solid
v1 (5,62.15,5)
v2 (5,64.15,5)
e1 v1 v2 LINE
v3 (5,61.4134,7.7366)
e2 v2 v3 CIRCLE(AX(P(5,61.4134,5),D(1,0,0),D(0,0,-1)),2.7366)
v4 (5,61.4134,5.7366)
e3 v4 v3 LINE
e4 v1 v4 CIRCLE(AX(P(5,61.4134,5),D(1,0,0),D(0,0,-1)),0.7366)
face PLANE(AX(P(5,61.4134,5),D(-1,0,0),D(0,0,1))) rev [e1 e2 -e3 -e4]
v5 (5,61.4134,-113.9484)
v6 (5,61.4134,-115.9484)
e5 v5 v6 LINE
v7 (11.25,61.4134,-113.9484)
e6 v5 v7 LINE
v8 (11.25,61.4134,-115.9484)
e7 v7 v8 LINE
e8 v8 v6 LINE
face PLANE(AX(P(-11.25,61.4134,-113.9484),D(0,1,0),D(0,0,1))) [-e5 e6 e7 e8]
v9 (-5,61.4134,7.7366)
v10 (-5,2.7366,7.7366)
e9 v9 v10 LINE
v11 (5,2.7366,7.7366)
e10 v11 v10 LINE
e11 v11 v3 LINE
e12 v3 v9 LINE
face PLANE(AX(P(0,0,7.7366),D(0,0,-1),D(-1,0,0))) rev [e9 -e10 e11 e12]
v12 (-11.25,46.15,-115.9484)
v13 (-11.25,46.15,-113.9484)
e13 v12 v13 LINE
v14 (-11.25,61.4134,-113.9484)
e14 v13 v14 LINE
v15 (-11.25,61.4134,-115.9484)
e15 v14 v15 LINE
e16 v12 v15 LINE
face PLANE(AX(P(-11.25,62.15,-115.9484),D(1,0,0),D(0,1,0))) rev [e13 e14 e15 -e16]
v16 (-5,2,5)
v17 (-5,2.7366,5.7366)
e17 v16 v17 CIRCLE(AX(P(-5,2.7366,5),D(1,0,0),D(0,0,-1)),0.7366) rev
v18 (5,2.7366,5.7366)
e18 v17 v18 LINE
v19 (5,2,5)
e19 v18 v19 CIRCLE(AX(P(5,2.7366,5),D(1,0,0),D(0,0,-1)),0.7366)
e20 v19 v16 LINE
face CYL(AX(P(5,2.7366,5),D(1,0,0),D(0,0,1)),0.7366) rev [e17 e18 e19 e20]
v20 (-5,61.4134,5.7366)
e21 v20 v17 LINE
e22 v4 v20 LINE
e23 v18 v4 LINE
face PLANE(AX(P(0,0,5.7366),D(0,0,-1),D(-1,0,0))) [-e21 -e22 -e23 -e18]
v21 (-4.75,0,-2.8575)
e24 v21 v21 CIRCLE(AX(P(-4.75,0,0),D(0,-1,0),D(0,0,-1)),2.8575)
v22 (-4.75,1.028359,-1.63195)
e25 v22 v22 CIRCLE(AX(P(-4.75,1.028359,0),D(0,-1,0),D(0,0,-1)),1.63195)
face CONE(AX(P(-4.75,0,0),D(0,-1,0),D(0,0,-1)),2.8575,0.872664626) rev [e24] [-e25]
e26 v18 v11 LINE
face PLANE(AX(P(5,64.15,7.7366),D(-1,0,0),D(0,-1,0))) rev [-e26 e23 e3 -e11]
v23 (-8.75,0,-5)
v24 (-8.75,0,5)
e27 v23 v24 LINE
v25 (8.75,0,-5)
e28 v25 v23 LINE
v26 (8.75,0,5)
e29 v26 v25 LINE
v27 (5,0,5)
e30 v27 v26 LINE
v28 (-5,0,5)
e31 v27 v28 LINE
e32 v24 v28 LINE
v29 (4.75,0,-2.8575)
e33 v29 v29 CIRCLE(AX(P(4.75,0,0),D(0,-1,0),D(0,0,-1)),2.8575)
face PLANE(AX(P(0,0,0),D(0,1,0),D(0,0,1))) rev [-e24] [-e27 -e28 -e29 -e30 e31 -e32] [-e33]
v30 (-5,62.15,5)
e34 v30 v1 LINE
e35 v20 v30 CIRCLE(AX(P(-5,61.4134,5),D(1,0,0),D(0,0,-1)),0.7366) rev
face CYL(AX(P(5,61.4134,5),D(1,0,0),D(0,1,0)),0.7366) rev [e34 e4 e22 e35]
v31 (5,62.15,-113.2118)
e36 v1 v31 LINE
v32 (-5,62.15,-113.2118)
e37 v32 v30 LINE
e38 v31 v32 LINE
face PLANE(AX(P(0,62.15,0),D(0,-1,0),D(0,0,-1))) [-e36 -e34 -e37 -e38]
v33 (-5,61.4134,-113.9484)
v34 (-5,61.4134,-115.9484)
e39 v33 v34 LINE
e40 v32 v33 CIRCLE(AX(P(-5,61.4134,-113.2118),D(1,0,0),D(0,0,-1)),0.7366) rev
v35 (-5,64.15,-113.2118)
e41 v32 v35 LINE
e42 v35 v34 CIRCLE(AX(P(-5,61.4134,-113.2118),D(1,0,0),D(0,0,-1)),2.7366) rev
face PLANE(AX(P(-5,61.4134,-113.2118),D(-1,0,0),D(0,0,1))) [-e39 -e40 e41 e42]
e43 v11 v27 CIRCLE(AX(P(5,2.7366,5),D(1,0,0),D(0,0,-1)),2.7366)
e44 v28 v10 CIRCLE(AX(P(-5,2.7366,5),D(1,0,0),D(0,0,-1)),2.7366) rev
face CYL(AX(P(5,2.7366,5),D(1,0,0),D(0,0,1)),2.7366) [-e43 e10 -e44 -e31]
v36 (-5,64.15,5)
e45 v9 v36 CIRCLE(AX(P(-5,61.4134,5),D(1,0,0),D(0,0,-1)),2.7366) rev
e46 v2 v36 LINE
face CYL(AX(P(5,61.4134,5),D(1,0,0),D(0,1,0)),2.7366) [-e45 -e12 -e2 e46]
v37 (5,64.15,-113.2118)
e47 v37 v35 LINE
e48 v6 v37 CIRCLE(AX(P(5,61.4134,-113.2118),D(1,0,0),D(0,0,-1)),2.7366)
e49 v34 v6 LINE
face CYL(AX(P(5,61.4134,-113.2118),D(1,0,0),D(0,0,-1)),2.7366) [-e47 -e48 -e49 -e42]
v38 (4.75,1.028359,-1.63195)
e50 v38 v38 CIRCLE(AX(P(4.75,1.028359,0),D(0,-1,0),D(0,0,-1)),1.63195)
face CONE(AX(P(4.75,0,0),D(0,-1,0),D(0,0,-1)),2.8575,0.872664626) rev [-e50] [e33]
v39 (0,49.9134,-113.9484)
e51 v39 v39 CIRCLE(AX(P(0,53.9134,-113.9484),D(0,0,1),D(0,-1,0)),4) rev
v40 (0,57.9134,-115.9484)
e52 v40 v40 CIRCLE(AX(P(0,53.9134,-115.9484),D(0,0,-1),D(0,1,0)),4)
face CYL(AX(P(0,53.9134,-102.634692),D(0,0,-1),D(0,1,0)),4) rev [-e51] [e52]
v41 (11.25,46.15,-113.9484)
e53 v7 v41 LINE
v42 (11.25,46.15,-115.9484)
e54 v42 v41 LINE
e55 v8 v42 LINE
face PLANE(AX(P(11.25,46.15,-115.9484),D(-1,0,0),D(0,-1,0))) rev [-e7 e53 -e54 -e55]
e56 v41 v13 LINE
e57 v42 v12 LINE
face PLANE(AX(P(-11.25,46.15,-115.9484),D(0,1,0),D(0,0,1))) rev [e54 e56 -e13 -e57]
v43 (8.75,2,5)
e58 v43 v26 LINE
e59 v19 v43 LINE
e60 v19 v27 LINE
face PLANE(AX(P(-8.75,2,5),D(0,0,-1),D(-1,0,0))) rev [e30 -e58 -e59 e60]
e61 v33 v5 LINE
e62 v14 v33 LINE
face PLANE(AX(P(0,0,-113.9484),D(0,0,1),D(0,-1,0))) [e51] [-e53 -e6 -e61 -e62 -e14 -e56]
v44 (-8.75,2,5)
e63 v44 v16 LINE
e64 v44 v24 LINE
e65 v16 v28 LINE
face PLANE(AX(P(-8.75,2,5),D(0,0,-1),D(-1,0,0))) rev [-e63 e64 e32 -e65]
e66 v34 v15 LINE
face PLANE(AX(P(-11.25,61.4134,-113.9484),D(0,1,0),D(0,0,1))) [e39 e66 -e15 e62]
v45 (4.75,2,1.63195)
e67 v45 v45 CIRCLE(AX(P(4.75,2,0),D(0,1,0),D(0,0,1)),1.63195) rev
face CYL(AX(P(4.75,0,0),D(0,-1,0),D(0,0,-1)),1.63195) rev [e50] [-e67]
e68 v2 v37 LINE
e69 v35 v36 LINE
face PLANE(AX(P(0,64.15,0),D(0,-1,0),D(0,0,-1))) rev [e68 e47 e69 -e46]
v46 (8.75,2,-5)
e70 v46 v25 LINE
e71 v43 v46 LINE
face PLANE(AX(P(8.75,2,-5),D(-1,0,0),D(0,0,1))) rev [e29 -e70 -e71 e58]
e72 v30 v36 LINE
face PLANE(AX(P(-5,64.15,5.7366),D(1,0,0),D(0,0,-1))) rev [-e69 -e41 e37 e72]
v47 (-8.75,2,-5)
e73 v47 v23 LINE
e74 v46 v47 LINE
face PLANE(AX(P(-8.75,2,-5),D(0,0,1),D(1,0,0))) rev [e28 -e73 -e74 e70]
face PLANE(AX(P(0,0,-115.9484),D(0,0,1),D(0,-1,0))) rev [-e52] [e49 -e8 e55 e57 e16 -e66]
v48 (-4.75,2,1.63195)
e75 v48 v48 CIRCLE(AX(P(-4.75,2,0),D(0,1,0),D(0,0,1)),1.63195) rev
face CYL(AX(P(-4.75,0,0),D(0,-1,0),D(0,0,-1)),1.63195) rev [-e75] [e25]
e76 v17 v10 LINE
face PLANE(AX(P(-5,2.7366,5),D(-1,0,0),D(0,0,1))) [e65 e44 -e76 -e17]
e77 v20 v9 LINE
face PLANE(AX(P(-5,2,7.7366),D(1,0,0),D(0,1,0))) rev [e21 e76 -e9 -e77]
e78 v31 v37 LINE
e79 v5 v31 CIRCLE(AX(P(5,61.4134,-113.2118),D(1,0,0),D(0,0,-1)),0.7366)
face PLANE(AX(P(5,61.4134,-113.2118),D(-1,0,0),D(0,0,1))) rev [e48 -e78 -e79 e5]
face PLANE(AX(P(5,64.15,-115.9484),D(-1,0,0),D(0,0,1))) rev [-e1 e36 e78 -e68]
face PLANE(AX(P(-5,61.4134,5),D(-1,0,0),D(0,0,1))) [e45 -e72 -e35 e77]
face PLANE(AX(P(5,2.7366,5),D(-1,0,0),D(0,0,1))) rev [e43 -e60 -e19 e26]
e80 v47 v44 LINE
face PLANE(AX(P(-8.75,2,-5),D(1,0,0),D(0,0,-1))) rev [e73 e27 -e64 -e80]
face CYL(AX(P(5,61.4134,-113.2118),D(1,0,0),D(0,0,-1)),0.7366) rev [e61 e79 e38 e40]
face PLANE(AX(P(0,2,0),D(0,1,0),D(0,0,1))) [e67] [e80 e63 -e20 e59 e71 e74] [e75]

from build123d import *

# Parameters (mm, degrees)
SKETCH1_W                                         = 17.5
SKETCH1_H                                         = 10
BASE_FLANGE1_DEPTH                                = 2
EDGE_FLANGE1_DEPTH                                = 10
EDGE_FLANGE2_STRIP_W                              = 9.4732
EDGE_FLANGE2_STRIP_H                              = 2
EDGE_FLANGE2_STRIP_CUT_DEPTH                      = 10
EDGE_FLANGE2_DEPTH                                = 10
EDGE_FLANGE3_STRIP_W                              = 9.4732
EDGE_FLANGE3_STRIP_H                              = 2
EDGE_FLANGE3_STRIP_CUT_DEPTH                      = 10
EDGE_FLANGE3_DEPTH                                = 10
EDGE_FLANGE3_PROFILE_W                            = 22.5
EDGE_FLANGE3_PROFILE_H                            = 15.2634
EDGE_FLANGE3_FLAT_DEPTH                           = 2
SKETCH18_R                                        = 4
CUT_EXTRUDE2_DEPTH                                = 2
CSK_FOR_4_FLAT_HEAD_MACHINE_SCREW_100_D           = 3.2639
CSK_FOR_4_FLAT_HEAD_MACHINE_SCREW_100_DEPTH       = 2
CSK_FOR_4_FLAT_HEAD_MACHINE_SCREW_100_CSINK_D     = 5.715
CSK_FOR_4_FLAT_HEAD_MACHINE_SCREW_100_CSINK_ANGLE = 100
CSK_FOR_4_FLAT_HEAD_MACHINE_SCREW_100_TIP         = 0.980574487


# Sheet-metal steps are written as plain solids
with BuildPart() as part:
    # Sketch1 → Base-Flange1 (new body)
    with BuildSketch(Plane(origin=(0, 0, 0), x_dir=(1, 0, 0), z_dir=(0, 1, 0))):
        Rectangle(SKETCH1_W, SKETCH1_H)
    extrude(amount=BASE_FLANGE1_DEPTH)

    # Edge-Flange1 section (across the edge) → Edge-Flange1 (add)
    with BuildSketch(Plane(origin=(-5, 2, 5.7366), x_dir=(0, 0, -1), z_dir=(1, 0, 0))):
        with BuildLine():
            Line((-2, 0.7366), (-2, 62.15))
            Line((-2, 62.15), (0, 62.15))
            Line((0, 62.15), (0, 0.7366))
            ThreePointArc((0, 0.7366), (0.215745145, 0.215745145), (0.7366, 0))
            Line((0.7366, 0), (0.7366, -2))
            ThreePointArc((0.7366, -2), (-1.198468417, -1.198468417), (-2, 0.7366))
        make_face()
    extrude(amount=EDGE_FLANGE1_DEPTH)

    # Edge-Flange2 strip (across the edge) → Edge-Flange2 strip cut (cut)
    with BuildSketch(Plane(origin=(-5, 64.15, 5.7366), x_dir=(0, -1, 0), z_dir=(1, 0, 0))):
        with Locations((-2, -1)):
            Rectangle(EDGE_FLANGE2_STRIP_W, EDGE_FLANGE2_STRIP_H)
    extrude(amount=EDGE_FLANGE2_STRIP_CUT_DEPTH, mode=Mode.SUBTRACT)

    # Edge-Flange2 section (across the edge) → Edge-Flange2 (add)
    with BuildSketch(Plane(origin=(-5, 64.15, 5.7366), x_dir=(0, -1, 0), z_dir=(1, 0, 0))):
        with BuildLine():
            Line((0, 0.7366), (0, 121.685))
            Line((0, 121.685), (2, 121.685))
            Line((2, 121.685), (2, 0.7366))
            ThreePointArc((2, 0.7366), (2.215745145, 0.215745145), (2.7366, 0))
            Line((2.7366, 0), (2.7366, -2))
            ThreePointArc((2.7366, -2), (0.801531583, -1.198468417), (0, 0.7366))
        make_face()
    extrude(amount=EDGE_FLANGE2_DEPTH)

    # Edge-Flange3 strip (across the edge) → Edge-Flange3 strip cut (cut)
    with BuildSketch(Plane(origin=(-5, 62.15, -115.9484), x_dir=(0, 0, 1), z_dir=(1, 0, 0))):
        with Locations((-2, -1)):
            Rectangle(EDGE_FLANGE3_STRIP_W, EDGE_FLANGE3_STRIP_H)
    extrude(amount=EDGE_FLANGE3_STRIP_CUT_DEPTH, mode=Mode.SUBTRACT)

    # Edge-Flange3 bend section (across the edge) → Edge-Flange3 (add)
    with BuildSketch(Plane(origin=(-5, 62.15, -115.9484), x_dir=(0, 0, 1), z_dir=(1, 0, 0))):
        with BuildLine():
            Line((0, 0.7366), (2, 0.7366))
            ThreePointArc((2, 0.7366), (2.215745145, 0.215745145), (2.7366, 0))
            Line((2.7366, 0), (2.7366, -2))
            ThreePointArc((2.7366, -2), (0.801531583, -1.198468417), (0, 0.7366))
        make_face()
    extrude(amount=EDGE_FLANGE3_DEPTH)

    # Edge-Flange3 profile (on flange) → Edge-Flange3 flat (add)
    with BuildSketch(Plane(origin=(0, 62.15, -115.9484), x_dir=(1, 0, 0), z_dir=(0, 0, -1))):
        with Locations((0, 8.3683)):
            Rectangle(EDGE_FLANGE3_PROFILE_W, EDGE_FLANGE3_PROFILE_H)
    extrude(amount=-EDGE_FLANGE3_FLAT_DEPTH)

    # Sketch18 → Cut-Extrude2 (cut)
    with BuildSketch(Plane(origin=(0, 0, -115.9484), x_dir=(-1, 0, 0), z_dir=(0, 0, -1))):
        with Locations(Location((0, 53.9134, 0), (0, 0, 90))):
            Circle(SKETCH18_R)
    extrude(amount=-CUT_EXTRUDE2_DEPTH, mode=Mode.SUBTRACT)

    # CSK for #4 Flat Head Machine Screw (100)1
    with Locations(Plane.XZ):
        with Locations((4.75, 0), (-4.75, 0)):
            CounterSinkHole(CSK_FOR_4_FLAT_HEAD_MACHINE_SCREW_100_D / 2, CSK_FOR_4_FLAT_HEAD_MACHINE_SCREW_100_CSINK_D / 2, depth=CSK_FOR_4_FLAT_HEAD_MACHINE_SCREW_100_DEPTH, counter_sink_angle=CSK_FOR_4_FLAT_HEAD_MACHINE_SCREW_100_CSINK_ANGLE)
            with Locations((0, 0, -(CSK_FOR_4_FLAT_HEAD_MACHINE_SCREW_100_DEPTH + CSK_FOR_4_FLAT_HEAD_MACHINE_SCREW_100_TIP / 2))):  # 118° drill point
                Cone(0, CSK_FOR_4_FLAT_HEAD_MACHINE_SCREW_100_D / 2, CSK_FOR_4_FLAT_HEAD_MACHINE_SCREW_100_TIP, mode=Mode.SUBTRACT)


solid = part.part
